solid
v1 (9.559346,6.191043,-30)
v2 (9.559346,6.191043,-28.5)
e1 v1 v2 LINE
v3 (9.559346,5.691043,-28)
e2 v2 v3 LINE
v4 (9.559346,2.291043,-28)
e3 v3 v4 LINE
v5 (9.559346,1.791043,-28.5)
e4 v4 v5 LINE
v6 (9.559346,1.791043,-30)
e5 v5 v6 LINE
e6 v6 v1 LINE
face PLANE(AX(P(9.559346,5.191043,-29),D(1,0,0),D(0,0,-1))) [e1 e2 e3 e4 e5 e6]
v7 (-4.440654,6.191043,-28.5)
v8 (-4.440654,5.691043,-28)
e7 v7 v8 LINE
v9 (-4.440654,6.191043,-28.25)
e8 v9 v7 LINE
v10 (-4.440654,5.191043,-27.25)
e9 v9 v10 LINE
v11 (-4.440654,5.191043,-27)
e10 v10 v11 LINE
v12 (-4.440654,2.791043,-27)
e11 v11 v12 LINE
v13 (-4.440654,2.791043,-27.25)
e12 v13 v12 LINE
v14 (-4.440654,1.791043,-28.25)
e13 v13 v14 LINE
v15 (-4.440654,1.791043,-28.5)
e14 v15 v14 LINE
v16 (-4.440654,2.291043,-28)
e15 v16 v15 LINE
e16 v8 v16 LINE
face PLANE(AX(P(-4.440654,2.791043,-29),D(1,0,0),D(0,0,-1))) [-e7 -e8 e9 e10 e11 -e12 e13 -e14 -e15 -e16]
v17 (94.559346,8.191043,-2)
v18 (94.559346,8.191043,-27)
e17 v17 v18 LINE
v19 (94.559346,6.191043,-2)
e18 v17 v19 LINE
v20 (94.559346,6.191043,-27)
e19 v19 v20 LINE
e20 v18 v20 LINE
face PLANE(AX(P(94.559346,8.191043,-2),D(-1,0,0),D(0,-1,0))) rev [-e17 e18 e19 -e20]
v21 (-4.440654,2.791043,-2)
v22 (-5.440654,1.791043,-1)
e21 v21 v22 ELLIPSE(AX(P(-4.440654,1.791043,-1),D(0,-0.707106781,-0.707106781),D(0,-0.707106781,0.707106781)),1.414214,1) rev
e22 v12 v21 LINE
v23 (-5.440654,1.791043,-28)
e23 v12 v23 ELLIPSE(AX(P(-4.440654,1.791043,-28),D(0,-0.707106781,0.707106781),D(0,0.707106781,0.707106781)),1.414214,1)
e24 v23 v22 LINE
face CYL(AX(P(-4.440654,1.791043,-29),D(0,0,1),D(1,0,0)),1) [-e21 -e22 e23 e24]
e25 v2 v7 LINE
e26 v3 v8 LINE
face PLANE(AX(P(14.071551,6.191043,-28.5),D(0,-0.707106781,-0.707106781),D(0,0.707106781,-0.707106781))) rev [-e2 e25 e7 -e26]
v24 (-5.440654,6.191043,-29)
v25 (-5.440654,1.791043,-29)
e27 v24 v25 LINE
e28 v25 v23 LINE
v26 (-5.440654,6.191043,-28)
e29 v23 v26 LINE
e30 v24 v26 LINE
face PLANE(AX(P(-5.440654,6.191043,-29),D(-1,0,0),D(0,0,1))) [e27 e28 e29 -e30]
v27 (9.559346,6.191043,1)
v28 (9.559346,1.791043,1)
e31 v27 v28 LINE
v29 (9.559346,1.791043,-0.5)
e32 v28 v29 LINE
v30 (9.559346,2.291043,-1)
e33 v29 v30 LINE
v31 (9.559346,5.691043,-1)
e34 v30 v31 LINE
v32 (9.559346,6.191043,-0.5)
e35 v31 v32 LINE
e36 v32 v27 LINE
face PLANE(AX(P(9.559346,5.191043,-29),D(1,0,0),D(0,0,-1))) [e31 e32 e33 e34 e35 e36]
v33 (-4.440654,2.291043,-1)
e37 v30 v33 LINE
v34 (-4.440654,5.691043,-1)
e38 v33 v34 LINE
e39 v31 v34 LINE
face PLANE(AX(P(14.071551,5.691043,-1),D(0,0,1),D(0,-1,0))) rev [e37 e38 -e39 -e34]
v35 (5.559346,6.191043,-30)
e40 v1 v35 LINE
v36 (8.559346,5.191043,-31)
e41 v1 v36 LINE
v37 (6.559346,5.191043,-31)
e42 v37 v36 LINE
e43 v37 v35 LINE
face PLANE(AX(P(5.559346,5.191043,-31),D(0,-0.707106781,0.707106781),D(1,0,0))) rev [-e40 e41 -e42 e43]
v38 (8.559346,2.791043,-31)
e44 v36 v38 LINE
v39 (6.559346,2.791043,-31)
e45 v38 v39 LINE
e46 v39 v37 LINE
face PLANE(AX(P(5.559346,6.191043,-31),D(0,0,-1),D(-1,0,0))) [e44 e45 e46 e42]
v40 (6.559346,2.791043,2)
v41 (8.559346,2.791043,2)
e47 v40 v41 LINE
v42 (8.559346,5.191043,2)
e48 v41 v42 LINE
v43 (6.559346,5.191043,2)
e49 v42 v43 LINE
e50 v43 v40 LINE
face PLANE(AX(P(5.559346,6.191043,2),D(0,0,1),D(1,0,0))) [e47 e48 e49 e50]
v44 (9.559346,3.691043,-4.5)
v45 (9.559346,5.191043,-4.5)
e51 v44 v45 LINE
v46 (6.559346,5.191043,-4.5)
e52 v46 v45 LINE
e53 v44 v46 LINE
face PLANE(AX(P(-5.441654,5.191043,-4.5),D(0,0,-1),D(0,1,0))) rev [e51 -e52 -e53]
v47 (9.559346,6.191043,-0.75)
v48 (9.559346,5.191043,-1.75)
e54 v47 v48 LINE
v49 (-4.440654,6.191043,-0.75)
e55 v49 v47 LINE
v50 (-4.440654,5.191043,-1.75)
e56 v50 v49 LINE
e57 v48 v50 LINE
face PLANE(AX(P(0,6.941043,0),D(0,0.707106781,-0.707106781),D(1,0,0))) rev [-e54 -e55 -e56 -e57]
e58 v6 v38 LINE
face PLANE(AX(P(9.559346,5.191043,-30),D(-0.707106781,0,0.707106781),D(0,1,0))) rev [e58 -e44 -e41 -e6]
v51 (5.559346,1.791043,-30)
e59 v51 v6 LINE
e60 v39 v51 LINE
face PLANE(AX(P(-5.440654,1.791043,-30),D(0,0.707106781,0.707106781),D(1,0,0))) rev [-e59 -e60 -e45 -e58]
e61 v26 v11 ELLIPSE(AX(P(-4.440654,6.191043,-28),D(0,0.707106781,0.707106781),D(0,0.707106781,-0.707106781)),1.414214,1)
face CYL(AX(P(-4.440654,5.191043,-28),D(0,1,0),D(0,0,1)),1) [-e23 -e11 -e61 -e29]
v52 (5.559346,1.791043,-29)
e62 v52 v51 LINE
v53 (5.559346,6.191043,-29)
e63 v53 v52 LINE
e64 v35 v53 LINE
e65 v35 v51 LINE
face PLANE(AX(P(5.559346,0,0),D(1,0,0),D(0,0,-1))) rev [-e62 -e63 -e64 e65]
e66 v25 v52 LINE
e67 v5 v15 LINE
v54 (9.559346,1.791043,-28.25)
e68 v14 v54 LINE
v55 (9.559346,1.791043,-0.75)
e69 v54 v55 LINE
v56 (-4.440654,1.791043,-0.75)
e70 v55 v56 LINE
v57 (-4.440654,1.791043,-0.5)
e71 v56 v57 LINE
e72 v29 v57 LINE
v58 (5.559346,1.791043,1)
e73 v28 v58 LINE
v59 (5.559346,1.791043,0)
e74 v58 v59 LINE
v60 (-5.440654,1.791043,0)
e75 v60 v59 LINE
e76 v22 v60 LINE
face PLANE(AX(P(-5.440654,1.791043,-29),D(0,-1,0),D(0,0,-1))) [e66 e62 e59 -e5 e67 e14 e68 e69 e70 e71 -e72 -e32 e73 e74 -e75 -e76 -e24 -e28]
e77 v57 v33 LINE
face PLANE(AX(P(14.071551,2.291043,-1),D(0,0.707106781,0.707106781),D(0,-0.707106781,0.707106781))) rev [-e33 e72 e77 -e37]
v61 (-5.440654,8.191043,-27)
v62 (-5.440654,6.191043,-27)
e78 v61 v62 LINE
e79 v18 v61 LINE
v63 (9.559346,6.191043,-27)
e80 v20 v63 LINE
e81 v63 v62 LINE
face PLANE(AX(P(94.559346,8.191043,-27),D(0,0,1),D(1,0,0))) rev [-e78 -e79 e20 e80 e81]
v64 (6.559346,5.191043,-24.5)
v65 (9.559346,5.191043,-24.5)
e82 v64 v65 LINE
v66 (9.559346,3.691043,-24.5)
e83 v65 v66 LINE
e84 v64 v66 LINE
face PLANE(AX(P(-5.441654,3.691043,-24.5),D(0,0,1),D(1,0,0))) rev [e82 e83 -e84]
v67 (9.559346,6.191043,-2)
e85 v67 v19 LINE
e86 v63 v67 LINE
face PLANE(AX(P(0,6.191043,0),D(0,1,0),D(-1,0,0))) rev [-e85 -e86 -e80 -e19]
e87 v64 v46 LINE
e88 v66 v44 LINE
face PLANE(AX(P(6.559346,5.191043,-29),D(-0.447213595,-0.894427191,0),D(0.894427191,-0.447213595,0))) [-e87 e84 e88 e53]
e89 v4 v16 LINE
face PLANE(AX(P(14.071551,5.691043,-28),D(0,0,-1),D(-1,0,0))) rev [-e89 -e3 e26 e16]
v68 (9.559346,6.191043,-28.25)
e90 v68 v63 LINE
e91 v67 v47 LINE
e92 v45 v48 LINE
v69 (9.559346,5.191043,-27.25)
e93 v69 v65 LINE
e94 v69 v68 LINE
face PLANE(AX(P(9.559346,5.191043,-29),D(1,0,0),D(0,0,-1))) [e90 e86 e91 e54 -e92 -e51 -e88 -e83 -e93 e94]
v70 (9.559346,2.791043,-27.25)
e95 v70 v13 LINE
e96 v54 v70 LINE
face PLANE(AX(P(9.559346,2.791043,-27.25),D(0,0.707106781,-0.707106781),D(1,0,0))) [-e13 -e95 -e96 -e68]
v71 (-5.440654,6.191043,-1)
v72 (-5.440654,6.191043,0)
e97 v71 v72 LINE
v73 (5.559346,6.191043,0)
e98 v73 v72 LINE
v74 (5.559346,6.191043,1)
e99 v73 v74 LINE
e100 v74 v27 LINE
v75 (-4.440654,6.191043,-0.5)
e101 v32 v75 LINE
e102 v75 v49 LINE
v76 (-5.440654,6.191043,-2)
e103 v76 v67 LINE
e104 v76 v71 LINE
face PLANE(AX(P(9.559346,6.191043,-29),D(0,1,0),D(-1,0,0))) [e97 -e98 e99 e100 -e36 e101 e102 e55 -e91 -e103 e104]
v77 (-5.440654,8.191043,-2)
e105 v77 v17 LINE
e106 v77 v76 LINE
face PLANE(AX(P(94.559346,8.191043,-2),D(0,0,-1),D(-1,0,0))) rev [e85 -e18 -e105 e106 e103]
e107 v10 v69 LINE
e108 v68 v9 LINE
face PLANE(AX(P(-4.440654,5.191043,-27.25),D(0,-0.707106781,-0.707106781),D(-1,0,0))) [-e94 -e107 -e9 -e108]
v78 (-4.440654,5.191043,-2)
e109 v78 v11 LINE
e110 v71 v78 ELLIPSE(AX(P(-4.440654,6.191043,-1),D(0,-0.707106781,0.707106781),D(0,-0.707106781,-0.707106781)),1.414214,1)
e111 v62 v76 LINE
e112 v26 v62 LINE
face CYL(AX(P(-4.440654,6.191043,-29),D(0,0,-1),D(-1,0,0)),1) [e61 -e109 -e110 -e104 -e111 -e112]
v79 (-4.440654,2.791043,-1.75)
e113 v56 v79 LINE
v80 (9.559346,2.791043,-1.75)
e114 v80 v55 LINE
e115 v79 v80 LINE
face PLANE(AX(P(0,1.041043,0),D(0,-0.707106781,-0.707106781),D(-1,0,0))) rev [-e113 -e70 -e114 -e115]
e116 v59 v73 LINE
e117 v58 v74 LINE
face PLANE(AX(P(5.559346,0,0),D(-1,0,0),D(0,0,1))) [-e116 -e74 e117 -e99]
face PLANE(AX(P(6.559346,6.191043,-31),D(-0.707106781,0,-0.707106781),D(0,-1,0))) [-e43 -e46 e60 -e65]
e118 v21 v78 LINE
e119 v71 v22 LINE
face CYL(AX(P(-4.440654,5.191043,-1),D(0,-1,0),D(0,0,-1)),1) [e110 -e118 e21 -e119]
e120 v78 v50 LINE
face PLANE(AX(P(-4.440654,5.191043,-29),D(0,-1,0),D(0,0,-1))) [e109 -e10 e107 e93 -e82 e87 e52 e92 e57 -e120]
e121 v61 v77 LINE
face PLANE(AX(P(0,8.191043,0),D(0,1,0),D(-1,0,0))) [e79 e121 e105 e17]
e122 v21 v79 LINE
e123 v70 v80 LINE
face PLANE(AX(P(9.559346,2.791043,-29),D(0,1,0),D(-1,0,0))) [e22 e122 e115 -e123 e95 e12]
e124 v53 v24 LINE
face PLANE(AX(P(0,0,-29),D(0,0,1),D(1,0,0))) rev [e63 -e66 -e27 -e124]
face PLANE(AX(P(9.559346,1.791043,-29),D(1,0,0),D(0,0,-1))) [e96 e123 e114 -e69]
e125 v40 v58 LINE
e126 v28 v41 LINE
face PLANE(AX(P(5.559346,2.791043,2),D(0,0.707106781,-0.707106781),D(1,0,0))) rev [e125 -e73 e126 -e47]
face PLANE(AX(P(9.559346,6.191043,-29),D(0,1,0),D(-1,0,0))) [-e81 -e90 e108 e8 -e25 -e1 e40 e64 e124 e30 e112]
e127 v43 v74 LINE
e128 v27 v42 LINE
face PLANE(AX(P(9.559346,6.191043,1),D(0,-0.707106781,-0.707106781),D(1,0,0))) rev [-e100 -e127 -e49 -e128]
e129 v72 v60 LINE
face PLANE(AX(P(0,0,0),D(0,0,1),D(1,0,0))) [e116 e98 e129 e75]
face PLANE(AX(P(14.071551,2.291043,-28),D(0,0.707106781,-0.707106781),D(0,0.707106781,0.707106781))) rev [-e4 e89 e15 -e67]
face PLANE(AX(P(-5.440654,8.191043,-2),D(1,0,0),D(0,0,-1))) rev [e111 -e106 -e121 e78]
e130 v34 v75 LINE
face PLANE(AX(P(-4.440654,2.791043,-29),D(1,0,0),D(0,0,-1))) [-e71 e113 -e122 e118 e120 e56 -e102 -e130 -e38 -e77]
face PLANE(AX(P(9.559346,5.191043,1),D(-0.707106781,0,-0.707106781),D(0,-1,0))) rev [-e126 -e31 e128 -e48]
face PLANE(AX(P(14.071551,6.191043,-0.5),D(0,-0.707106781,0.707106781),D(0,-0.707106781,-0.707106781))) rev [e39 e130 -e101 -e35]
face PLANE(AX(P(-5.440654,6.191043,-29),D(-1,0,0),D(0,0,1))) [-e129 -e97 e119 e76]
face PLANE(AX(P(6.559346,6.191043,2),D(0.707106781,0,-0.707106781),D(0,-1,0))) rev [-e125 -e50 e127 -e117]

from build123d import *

# Parameters (mm, degrees)
BOSS_EXTRUDE1_DEPTH = 29
CUT_EXTRUDE1_REACH  = 35.231
SKETCH3_W           = 4.5
SKETCH3_H           = 1.5
CUT_EXTRUDE2_REACH  = 35.231
SKETCH4_W           = 25
SKETCH4_H           = 2.4
FILLET1_R           = 1
CHAMFER1_SIZE       = 1.75
BOSS_EXTRUDE2_DEPTH = 14
SKETCH6_W           = 2
SKETCH6_H           = 4.4
BOSS_EXTRUDE3_DEPTH = 4
CHAMFER2_SIZE       = 1
SKETCH7_W           = 100
SKETCH7_H           = 25
BOSS_EXTRUDE4_DEPTH = 2


# Some blends are built 0.0001 mm under size
with BuildPart() as part:
    # Sketch2 → Boss-Extrude1 (new body)
    with BuildSketch(Plane.XY):
        Polygon((6.559345521, 5.191043118), (9.559345521, 3.691043118), (9.559345521, 5.191043118), (9.559345521, 6.191043118), (-5.440654479, 6.191043118), (-5.440654479, 1.791043118), (9.559345521, 1.791043118), (9.559345521, 2.791043118), (-4.440654479, 2.791043118), (-4.440654479, 5.191043118), align=None)
    extrude(amount=-BOSS_EXTRUDE1_DEPTH)

    # Sketch3 → Cut-Extrude1 (cut, up to next)
    with BuildSketch(Plane(origin=(9.559345521, 0, 0), x_dir=(0, 0, -1), z_dir=(1, 0, 0)), mode=Mode.PRIVATE) as cut_extrude1_sk1:
        with Locations((2.25, 4.441043118)):
            Rectangle(SKETCH3_W, SKETCH3_H)
    cut_extrude1_tool1 = extrude(cut_extrude1_sk1.sketch, amount=-CUT_EXTRUDE1_REACH, mode=Mode.PRIVATE) & part.part
    # Sketch3 → Cut-Extrude1 (cut, up to next)
    with BuildSketch(Plane(origin=(9.559345521, 0, 0), x_dir=(0, 0, -1), z_dir=(1, 0, 0)), mode=Mode.PRIVATE) as cut_extrude1_sk2:
        with Locations((26.75, 4.441043118)):
            Rectangle(SKETCH3_W, SKETCH3_H)
    cut_extrude1_tool2 = extrude(cut_extrude1_sk2.sketch, amount=-CUT_EXTRUDE1_REACH, mode=Mode.PRIVATE) & part.part
    add(cut_extrude1_tool1.solids().sort_by_distance((9.559346, 4.441043, -2.25))[0], mode=Mode.SUBTRACT)
    add(cut_extrude1_tool2.solids().sort_by_distance((9.559346, 4.441043, -26.75))[0], mode=Mode.SUBTRACT)

    # Sketch4 → Cut-Extrude2 (cut, up to next)
    with BuildSketch(Plane.ZY.offset(5.440654479), mode=Mode.PRIVATE) as cut_extrude2_sk1:
        with Locations((-14.5, 3.991043118)):
            Rectangle(SKETCH4_W, SKETCH4_H)
    cut_extrude2_tool1 = extrude(cut_extrude2_sk1.sketch, amount=-CUT_EXTRUDE2_REACH, mode=Mode.PRIVATE) & part.part
    add(cut_extrude2_tool1.solids().sort_by_distance((-5.440654, 3.991043, -14.5))[0], mode=Mode.SUBTRACT)

    # Fillet1
    fillet1_edges = [part.edges().sort_by_distance(p)[0] for p in [
        (-5.440654479, 3.991043118, -2),
        (-5.440654479, 2.791043118, -14.5),
        (-5.440654479, 3.991043118, -27),
        (-5.440654479, 5.191043118, -14.5),
    ]]
    fillet(fillet1_edges, radius=FILLET1_R - 0.0001)  # a hair under: the kernel refuses the full size

    # Chamfer1
    # the kernel refuses this chamfer: 1.75 mm, written as the material it takes off along each edge
    with BuildSketch(Plane(origin=(14.05979075, 2.791043118, -29), x_dir=(0, -0.9996219169112968, -0.02749587661058612), z_dir=(-1, 0, 0))) as chamfer1_piece_1:
        Polygon((CHAMFER1_SIZE * 0.999621916911, CHAMFER1_SIZE * 0.0274958766106), (-CHAMFER1_SIZE * 0.0274958766106, CHAMFER1_SIZE * 0.999621916911), (0, 0), align=None)
    extrude(amount=18.500445229, mode=Mode.SUBTRACT)
    with BuildSketch(Plane(origin=(-4.440654479, 5.191043118, -29), x_dir=(0, -0.02749587661058662, 0.9996219169112968), z_dir=(1, 0, 0)), Plane(origin=(14.05979075, 5.191043118, 0), x_dir=(0, -0.02749587661058661, -0.9996219169112968), z_dir=(-1, 0, 0)), Plane(origin=(14.05979075, 2.791043118, 0), x_dir=(0, -0.9996219169112968, 0.027495876610586382), z_dir=(-1, 0, 0))) as chamfer1_piece_2:
        Polygon((CHAMFER1_SIZE * 0.999621916911, -CHAMFER1_SIZE * 0.0274958766106), (-CHAMFER1_SIZE * 0.0274958766106, -CHAMFER1_SIZE * 0.999621916911), (0, 0), align=None)
    extrude(amount=18.500445229, mode=Mode.SUBTRACT)

    # Sketch5 → Boss-Extrude2 (add)
    with BuildSketch(Plane(origin=(-4.440654479, 0, 0), x_dir=(0, 0, -1), z_dir=(1, 0, 0))):
        Polygon((0, 1.791043118), (0, 6.191043118), (0.5, 6.191043118), (1, 5.691043118), (1, 2.291043118), (0.5, 1.791043118), align=None)
        Polygon((28, 2.291043118), (28.5, 1.791043118), (29, 1.791043118), (29, 6.191043118), (28.5, 6.191043118), (28, 5.691043118), align=None)
    extrude(amount=BOSS_EXTRUDE2_DEPTH)

    # Sketch6 → Boss-Extrude3 (add)
    with BuildSketch(Plane(origin=(9.559345521, 0, 0), x_dir=(0, 0, -1), z_dir=(1, 0, 0))):
        with Locations((-1, 3.991043118)):
            Rectangle(SKETCH6_W, SKETCH6_H)
        with Locations((30, 3.991043118)):
            Rectangle(SKETCH6_W, SKETCH6_H)
    extrude(amount=-BOSS_EXTRUDE3_DEPTH)

    # Chamfer2
    chamfer2_edges = [part.edges().sort_by_distance(p)[0] for p in [
        (5.559345521, 3.991043118, 2),
        (7.559345521, 1.791043118, 2),
        (7.559345521, 6.191043118, 2),
        (9.559345521, 3.991043118, 2),
        (5.559345521, 3.991043118, -31),
        (7.559345521, 6.191043118, -31),
        (7.559345521, 1.791043118, -31),
        (9.559345521, 3.991043118, -31),
    ]]
    chamfer(chamfer2_edges, length=CHAMFER2_SIZE)

    # Sketch7 → Boss-Extrude4 (add)
    with BuildSketch(Plane(origin=(0, 6.191043118, 0), x_dir=(1, 0, 0), z_dir=(0, 1, 0))):
        with Locations((44.559345521, 14.5)):
            Rectangle(SKETCH7_W, SKETCH7_H)
    extrude(amount=BOSS_EXTRUDE4_DEPTH)


solid = part.part
